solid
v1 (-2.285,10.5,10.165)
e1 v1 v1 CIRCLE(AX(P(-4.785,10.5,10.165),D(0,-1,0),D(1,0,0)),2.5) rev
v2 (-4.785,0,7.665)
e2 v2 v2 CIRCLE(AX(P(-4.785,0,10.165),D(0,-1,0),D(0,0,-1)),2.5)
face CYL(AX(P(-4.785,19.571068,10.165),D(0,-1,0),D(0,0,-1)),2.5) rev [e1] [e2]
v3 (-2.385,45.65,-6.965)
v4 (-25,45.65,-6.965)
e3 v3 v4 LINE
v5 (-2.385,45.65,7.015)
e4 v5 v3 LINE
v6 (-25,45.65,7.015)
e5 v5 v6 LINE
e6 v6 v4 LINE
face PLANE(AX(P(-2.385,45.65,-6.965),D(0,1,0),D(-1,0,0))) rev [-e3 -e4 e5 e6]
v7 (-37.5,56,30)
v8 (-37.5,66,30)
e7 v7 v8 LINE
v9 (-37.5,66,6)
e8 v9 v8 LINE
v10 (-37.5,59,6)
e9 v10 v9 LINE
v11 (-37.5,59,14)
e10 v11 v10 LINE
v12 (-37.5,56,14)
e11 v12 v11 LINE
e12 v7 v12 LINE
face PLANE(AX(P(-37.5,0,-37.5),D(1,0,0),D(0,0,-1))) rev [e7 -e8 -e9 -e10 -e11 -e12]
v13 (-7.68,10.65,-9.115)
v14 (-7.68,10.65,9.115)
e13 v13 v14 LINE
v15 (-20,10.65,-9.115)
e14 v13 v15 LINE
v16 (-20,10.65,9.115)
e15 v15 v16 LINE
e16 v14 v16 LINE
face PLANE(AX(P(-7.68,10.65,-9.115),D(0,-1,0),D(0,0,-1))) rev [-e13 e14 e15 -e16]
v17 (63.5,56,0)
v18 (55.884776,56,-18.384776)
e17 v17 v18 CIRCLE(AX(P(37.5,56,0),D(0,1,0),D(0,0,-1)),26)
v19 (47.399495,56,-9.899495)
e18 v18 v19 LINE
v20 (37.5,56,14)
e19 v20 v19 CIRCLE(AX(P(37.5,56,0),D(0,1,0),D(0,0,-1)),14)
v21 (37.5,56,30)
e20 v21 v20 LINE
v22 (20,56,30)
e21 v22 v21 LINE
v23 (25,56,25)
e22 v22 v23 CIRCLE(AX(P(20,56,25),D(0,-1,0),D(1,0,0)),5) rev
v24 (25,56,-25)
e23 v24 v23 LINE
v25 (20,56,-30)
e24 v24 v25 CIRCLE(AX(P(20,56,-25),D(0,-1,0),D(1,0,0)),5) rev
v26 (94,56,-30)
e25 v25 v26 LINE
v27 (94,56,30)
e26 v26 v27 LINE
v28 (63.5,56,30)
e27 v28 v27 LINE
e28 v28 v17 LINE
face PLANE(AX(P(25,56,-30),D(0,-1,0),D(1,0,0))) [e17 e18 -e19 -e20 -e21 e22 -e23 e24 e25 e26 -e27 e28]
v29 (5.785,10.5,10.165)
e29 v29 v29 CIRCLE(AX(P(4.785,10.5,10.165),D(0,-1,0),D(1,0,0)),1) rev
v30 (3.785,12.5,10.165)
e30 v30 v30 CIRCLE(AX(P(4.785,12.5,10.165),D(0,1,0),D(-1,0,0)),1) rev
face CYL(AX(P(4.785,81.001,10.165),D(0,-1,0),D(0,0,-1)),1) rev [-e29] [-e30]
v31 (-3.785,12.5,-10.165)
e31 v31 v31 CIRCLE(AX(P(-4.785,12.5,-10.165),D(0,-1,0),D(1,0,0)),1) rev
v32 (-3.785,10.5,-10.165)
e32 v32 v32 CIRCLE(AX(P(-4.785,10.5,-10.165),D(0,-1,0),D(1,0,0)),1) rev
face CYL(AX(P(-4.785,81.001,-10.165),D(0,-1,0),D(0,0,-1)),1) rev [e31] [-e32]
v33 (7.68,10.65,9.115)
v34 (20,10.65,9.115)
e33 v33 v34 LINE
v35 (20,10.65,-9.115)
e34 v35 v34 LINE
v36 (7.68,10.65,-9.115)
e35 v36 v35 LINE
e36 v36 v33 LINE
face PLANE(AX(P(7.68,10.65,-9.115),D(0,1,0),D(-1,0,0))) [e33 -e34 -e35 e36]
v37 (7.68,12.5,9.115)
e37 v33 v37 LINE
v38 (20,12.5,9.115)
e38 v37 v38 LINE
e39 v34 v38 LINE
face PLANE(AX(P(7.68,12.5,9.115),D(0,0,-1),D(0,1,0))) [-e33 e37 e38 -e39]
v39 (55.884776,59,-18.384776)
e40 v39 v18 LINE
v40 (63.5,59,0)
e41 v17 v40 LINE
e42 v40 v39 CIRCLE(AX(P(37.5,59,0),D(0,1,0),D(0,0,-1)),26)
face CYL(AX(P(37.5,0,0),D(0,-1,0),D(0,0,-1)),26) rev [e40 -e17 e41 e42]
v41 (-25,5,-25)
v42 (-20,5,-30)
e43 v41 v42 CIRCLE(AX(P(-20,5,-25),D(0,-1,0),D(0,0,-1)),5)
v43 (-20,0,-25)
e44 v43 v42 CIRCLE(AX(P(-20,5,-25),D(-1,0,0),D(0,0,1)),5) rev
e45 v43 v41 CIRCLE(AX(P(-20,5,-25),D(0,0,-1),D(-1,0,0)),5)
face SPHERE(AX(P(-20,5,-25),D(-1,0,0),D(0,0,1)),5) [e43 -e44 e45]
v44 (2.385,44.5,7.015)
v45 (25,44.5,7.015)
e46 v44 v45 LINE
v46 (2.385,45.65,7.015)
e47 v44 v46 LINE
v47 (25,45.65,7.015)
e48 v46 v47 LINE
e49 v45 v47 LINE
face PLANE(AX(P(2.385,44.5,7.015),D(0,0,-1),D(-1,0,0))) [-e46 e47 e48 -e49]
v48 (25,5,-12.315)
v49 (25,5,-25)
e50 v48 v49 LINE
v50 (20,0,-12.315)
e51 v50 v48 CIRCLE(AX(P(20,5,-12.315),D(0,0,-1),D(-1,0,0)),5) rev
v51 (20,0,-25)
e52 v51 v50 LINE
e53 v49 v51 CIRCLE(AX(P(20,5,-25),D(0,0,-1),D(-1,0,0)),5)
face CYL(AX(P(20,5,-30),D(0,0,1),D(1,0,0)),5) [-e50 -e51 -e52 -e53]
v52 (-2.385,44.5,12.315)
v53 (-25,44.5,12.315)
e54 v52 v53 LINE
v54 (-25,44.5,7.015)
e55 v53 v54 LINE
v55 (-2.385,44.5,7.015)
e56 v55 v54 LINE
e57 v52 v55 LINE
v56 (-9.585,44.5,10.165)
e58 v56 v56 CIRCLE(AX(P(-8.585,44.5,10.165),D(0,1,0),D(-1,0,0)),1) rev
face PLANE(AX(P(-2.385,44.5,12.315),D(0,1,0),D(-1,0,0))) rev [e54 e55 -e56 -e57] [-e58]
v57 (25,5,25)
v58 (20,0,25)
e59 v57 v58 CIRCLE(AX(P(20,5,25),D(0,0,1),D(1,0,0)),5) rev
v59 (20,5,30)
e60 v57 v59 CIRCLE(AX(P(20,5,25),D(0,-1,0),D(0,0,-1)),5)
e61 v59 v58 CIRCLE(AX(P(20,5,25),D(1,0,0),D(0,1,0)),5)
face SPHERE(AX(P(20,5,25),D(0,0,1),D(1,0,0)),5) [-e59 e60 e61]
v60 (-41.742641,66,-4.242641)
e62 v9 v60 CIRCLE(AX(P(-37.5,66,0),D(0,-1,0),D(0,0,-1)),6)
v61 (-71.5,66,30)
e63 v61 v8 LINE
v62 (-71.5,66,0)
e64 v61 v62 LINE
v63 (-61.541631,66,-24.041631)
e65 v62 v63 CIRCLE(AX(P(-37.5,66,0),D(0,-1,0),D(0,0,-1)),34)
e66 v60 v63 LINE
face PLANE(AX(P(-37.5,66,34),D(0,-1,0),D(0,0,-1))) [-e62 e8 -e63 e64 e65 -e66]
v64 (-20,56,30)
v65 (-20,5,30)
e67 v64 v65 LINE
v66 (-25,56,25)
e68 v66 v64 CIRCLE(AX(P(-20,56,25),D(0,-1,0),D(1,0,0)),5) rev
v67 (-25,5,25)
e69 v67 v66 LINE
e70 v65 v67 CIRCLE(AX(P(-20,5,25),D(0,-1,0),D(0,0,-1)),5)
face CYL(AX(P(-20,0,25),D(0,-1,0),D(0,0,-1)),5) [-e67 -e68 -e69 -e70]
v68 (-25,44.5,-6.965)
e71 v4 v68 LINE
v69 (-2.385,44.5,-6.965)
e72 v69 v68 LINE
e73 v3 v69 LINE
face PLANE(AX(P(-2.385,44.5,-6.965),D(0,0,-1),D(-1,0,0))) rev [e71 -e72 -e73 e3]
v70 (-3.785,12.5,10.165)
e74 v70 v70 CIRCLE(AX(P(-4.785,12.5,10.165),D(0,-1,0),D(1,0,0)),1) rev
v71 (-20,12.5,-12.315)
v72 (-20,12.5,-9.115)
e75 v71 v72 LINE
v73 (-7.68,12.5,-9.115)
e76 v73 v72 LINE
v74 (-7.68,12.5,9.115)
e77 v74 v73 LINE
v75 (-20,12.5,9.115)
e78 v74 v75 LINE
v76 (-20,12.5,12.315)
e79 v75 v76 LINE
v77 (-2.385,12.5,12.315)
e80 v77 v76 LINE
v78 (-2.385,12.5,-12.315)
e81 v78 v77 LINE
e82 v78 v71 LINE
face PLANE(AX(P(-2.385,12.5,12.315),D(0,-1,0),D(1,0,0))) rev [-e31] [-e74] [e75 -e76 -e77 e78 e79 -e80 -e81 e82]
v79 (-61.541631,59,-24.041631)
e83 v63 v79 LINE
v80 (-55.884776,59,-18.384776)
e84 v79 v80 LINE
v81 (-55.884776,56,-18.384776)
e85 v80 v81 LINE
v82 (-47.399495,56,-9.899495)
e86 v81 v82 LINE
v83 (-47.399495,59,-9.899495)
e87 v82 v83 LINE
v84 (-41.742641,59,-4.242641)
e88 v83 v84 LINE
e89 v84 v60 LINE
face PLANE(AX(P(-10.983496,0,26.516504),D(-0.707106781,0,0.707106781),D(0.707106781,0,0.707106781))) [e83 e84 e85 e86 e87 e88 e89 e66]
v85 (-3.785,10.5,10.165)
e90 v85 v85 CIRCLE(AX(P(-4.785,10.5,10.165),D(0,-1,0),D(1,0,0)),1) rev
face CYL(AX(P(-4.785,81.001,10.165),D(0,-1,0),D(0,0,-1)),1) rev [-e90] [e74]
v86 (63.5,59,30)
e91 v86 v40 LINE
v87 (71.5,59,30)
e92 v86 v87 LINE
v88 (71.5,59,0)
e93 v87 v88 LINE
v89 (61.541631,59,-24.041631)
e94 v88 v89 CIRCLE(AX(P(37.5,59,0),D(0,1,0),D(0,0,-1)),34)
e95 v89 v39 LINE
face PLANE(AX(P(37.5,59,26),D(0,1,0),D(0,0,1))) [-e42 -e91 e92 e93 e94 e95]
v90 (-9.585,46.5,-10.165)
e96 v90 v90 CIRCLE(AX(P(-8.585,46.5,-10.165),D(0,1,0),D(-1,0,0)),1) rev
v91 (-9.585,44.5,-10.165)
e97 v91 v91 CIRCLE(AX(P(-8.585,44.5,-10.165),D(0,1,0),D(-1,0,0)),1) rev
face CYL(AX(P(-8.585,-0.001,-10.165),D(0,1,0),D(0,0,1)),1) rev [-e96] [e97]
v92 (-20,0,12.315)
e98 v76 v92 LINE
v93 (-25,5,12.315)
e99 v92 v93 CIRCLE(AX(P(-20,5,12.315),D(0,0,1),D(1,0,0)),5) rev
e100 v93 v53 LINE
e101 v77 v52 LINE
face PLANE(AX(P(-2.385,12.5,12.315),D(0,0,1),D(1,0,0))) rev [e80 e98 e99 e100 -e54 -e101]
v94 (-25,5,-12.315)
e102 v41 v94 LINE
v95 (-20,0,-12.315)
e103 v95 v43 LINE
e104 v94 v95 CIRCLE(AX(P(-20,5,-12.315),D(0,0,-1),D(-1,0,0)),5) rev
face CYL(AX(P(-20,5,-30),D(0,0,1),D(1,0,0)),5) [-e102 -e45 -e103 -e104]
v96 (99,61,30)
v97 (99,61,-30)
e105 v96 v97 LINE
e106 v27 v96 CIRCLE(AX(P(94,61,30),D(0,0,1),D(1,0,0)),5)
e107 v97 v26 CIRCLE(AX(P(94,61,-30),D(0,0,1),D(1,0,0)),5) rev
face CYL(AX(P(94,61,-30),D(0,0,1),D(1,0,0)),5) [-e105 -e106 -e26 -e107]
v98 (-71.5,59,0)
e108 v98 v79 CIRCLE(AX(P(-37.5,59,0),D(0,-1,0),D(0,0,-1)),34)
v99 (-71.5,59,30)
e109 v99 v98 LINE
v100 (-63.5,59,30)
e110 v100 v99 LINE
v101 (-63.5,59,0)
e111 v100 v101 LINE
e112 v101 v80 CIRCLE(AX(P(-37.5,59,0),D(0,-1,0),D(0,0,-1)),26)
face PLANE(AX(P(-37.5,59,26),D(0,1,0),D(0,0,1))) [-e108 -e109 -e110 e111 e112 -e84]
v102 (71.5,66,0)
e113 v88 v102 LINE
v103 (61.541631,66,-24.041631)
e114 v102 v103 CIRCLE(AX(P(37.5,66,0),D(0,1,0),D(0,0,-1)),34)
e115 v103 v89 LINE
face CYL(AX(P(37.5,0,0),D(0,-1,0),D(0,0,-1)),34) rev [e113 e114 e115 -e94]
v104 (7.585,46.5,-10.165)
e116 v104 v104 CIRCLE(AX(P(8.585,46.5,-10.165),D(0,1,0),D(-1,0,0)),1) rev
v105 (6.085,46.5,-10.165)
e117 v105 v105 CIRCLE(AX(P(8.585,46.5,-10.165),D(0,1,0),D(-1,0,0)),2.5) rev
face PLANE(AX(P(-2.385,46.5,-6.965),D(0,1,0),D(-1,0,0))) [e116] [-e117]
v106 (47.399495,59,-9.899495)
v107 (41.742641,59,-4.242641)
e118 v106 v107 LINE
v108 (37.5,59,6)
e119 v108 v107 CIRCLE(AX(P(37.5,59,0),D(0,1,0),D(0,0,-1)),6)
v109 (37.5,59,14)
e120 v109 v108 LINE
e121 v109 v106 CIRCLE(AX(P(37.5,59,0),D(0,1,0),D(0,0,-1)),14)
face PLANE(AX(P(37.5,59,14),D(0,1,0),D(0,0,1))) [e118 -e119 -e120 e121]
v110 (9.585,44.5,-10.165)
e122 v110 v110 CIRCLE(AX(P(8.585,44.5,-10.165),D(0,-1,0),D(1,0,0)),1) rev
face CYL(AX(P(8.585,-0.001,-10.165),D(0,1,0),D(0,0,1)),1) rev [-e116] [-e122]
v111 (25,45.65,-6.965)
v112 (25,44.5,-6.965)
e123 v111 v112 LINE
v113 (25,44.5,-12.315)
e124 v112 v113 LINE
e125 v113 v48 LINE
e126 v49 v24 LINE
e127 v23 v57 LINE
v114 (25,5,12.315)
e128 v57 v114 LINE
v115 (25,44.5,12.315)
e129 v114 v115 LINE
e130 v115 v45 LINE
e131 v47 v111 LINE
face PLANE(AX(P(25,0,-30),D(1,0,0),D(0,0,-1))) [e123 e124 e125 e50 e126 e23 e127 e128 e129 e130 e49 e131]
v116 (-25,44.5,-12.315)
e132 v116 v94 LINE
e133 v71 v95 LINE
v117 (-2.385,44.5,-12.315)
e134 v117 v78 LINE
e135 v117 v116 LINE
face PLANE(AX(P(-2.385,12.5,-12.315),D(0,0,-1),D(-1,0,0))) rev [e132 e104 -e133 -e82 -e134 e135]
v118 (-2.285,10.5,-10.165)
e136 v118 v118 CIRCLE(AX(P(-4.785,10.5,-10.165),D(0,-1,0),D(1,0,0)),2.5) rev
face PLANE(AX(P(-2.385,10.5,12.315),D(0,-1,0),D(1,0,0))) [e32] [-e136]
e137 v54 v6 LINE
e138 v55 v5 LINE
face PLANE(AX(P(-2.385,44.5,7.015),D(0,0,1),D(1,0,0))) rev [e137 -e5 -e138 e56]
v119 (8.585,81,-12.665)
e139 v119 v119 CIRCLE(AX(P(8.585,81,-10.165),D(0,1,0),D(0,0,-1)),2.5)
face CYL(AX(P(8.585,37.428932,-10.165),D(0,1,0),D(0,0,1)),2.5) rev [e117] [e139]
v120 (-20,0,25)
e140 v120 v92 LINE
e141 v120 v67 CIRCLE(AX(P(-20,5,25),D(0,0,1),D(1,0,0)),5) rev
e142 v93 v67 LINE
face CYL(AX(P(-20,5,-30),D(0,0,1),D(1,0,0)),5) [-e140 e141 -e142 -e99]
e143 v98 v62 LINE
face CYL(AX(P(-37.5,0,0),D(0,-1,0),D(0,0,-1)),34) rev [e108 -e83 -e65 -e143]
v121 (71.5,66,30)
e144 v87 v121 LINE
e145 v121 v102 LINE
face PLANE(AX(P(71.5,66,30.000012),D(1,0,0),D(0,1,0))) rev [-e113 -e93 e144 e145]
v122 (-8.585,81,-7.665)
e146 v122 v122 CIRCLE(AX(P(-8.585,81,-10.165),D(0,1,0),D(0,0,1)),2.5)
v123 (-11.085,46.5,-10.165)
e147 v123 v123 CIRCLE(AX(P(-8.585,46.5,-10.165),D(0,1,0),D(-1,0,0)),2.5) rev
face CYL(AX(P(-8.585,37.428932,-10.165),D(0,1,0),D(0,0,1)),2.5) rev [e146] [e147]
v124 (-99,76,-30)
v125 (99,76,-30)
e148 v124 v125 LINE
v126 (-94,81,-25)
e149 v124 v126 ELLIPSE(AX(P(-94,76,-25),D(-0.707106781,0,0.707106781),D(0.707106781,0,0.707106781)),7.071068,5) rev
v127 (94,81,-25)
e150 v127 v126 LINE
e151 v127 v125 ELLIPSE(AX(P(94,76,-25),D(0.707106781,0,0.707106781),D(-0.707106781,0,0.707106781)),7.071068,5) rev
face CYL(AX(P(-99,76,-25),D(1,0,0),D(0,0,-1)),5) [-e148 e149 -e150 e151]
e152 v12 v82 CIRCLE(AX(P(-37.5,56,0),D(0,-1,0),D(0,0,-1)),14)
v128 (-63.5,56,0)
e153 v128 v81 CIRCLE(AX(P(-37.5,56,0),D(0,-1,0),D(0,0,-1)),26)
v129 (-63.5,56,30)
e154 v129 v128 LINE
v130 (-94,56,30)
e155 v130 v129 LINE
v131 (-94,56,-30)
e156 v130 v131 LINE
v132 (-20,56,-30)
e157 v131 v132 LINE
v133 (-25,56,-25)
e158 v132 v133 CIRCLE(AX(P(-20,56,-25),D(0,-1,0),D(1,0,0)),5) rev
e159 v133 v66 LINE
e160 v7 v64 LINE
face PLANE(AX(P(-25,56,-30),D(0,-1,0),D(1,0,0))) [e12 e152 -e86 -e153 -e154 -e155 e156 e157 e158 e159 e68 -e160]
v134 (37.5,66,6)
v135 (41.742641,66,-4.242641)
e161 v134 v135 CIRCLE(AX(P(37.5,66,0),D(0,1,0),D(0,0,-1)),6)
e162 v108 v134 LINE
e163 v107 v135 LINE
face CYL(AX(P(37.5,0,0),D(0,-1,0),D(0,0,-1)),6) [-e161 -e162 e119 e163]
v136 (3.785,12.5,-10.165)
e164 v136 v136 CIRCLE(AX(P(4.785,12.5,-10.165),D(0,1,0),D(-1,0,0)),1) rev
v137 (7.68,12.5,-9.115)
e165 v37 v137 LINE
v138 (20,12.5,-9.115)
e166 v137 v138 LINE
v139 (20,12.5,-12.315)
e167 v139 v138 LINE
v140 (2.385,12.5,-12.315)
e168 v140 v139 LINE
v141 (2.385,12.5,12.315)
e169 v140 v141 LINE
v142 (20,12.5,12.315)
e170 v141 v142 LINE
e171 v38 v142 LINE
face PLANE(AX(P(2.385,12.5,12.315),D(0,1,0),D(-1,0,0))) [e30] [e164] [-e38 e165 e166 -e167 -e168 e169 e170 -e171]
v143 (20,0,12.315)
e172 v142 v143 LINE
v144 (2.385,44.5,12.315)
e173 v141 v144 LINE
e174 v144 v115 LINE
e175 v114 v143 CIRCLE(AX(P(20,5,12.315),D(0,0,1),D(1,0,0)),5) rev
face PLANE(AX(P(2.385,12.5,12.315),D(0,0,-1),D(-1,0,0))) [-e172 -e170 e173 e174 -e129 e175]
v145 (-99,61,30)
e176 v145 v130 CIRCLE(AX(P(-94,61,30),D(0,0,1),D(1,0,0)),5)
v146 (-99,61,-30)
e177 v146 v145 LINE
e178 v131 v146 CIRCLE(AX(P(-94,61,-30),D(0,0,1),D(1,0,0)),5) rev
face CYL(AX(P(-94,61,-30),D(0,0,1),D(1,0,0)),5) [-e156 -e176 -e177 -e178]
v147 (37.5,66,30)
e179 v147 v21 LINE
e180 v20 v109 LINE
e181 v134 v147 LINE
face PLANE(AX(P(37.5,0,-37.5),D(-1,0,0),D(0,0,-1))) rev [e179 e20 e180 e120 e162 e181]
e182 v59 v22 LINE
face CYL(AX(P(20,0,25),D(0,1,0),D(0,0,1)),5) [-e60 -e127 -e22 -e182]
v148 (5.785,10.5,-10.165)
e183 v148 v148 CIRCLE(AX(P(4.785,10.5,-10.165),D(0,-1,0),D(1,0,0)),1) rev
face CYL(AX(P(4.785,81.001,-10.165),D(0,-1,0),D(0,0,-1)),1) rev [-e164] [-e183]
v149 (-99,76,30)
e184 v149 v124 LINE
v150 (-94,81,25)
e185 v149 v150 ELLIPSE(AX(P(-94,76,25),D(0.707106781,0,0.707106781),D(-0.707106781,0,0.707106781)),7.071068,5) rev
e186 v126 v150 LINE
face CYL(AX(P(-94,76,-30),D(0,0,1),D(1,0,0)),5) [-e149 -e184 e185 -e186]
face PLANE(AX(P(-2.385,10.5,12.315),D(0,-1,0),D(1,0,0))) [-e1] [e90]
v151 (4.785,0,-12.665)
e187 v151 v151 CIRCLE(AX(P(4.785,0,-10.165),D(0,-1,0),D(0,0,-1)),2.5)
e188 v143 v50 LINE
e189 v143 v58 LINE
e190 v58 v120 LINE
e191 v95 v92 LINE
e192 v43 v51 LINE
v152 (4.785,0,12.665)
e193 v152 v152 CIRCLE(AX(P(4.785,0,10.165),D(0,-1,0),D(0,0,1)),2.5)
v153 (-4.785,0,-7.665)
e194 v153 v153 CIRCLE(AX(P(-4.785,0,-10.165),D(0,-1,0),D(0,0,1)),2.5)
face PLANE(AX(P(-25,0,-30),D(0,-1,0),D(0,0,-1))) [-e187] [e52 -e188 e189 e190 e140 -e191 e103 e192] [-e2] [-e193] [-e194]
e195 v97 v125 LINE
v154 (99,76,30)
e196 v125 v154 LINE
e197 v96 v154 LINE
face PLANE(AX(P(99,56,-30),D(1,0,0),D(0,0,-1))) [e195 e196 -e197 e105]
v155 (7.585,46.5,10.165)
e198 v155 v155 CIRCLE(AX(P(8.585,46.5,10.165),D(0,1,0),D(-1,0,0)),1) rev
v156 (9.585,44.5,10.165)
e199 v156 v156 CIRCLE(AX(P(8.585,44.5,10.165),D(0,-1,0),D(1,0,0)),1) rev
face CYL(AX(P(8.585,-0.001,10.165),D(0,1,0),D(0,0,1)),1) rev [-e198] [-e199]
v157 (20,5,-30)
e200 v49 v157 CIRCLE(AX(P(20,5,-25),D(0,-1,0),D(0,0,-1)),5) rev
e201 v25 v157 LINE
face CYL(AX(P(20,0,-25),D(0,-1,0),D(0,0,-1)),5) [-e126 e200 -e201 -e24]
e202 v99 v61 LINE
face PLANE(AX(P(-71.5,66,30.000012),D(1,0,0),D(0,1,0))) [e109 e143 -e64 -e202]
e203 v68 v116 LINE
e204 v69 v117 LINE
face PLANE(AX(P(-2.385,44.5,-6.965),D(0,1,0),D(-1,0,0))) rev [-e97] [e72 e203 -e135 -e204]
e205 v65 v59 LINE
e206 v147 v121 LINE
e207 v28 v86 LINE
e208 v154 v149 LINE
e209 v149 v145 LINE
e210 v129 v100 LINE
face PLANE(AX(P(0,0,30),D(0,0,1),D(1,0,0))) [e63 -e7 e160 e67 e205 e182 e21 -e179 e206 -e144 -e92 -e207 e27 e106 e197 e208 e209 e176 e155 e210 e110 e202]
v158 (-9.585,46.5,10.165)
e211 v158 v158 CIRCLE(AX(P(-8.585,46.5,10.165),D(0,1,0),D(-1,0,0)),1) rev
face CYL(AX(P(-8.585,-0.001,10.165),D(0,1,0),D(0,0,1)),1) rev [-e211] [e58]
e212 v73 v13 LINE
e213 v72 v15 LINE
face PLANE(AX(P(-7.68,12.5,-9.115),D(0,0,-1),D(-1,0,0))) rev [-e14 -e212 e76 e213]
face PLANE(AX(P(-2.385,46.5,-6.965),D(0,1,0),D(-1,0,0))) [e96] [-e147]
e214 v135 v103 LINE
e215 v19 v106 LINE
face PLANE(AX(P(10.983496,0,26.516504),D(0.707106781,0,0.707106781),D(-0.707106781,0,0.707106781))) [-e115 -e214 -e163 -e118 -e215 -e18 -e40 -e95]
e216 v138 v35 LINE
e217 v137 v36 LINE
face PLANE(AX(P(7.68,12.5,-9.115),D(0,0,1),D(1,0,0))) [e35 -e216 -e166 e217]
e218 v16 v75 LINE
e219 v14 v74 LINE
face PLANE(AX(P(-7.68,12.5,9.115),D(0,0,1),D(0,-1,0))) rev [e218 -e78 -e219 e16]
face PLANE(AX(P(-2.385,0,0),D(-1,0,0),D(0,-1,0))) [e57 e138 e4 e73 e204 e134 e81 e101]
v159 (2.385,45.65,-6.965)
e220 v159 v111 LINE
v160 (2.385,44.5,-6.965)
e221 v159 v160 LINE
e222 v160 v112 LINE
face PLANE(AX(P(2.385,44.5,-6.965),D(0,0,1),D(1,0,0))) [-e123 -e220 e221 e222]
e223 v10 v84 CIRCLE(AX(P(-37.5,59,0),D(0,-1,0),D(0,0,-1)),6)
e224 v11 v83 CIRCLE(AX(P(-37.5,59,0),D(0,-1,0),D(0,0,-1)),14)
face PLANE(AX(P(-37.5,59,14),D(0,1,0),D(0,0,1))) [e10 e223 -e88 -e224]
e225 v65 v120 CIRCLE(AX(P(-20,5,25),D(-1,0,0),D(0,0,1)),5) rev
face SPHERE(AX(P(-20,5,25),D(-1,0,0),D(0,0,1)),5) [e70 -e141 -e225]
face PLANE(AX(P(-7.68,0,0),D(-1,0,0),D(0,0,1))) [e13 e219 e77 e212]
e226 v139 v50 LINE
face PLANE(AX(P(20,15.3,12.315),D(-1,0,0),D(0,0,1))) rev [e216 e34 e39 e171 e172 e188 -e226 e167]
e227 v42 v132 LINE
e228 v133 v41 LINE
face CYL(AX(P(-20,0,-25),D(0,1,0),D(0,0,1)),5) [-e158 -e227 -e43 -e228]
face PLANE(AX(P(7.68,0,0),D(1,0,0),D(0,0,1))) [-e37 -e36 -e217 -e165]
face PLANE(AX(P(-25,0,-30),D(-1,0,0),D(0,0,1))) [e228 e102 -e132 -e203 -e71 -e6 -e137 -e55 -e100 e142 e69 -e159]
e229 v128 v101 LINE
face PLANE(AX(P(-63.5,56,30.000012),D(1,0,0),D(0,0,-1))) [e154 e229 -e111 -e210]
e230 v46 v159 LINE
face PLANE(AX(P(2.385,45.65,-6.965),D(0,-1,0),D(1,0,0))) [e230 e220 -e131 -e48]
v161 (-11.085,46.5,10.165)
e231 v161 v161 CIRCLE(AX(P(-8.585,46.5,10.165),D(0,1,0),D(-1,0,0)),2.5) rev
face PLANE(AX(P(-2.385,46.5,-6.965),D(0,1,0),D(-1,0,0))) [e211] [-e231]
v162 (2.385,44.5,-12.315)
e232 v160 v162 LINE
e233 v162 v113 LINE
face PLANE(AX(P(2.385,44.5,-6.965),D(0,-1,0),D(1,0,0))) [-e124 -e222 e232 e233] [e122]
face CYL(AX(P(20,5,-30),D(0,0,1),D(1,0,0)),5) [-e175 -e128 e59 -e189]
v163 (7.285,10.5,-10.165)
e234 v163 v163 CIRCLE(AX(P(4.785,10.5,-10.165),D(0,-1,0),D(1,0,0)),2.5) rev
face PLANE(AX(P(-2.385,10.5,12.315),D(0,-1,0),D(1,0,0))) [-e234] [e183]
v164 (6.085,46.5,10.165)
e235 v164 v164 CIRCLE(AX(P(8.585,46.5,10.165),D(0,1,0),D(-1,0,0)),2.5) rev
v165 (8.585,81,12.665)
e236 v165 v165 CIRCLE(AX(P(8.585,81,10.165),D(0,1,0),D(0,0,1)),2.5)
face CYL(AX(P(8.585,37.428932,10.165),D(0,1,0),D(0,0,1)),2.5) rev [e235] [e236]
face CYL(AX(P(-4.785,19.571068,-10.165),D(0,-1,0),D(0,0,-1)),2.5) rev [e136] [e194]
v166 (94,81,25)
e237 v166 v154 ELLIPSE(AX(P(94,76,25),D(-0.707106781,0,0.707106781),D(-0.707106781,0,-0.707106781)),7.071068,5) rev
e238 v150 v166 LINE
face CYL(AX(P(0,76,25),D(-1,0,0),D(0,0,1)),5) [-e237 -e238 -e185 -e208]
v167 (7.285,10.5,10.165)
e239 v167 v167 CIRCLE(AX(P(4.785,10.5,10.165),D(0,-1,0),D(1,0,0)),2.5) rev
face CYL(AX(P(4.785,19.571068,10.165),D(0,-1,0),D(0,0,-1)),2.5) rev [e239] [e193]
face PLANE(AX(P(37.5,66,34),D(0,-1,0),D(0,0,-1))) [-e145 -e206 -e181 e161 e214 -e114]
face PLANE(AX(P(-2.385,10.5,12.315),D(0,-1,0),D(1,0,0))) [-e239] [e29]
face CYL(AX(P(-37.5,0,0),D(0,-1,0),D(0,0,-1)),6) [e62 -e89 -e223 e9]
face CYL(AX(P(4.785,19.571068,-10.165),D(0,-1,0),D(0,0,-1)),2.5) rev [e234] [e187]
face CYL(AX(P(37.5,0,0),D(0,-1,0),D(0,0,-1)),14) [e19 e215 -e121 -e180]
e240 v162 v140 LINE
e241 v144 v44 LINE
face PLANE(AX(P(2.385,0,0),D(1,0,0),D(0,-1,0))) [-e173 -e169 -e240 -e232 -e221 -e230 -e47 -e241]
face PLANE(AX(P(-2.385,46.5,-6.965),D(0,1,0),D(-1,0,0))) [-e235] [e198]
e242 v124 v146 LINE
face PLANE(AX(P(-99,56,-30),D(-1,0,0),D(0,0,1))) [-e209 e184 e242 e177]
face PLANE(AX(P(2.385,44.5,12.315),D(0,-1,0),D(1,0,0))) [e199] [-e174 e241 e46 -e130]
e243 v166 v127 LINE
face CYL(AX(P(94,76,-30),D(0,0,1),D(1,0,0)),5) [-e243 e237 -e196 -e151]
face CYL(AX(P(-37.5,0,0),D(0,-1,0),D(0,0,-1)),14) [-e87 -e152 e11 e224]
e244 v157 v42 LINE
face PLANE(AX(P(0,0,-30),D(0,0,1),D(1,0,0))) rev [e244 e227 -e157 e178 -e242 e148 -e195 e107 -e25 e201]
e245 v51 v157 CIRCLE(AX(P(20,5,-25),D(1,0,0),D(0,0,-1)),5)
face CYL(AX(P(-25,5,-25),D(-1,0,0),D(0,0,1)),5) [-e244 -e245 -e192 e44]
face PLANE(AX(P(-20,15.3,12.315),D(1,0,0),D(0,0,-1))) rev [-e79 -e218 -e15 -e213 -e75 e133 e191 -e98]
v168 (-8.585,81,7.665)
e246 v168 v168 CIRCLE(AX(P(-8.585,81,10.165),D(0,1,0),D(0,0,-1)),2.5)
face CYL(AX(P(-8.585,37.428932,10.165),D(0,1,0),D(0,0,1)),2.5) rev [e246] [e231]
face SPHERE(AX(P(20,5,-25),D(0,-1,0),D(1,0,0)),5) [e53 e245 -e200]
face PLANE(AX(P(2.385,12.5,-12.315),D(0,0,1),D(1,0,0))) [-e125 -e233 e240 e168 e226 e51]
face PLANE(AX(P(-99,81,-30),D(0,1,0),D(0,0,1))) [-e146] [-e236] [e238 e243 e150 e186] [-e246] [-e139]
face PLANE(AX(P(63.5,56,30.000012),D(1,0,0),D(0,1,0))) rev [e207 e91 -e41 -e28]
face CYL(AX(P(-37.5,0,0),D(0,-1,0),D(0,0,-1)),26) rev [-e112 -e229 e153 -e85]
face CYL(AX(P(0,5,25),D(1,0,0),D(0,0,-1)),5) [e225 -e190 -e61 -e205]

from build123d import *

# Parameters (mm, degrees)
BOSS_EXTRUDE1_DEPTH            = 30
BOSS_EXTRUDE1_DEPTH_BACK       = 30
CUT_REVOLVE2_START             = 59
CUT_REVOLVE2_DEPTH             = 7
CUT_REVOLVE2_START_2           = 56
CUT_REVOLVE2_2_DEPTH           = 3
CUT_EXTRUDE1_DEPTH             = 22.615
CUT_EXTRUDE2_REACH             = 143.287
CUT_EXTRUDE2_DIRECTION_2_DEPTH = 142.286942072
FILLET5_R                      = 5
FILLET6_R                      = 5
SKETCH7_W                      = 18.23
SKETCH7_H                      = 1.85
CUT_EXTRUDE3_DEPTH             = 17.32
SKETCH8_W                      = 20
SKETCH8_H                      = 24.63
CUT_EXTRUDE4_DEPTH             = 15.3
CUT_EXTRUDE5_REACH             = 133.385
SKETCH10_R                     = 1
SKETCH12_R                     = 2.5
CUT_EXTRUDE6_DEPTH             = 10.5
CUT_EXTRUDE7_REACH             = 133.385
SKETCH13_R                     = 1
SKETCH14_R                     = 2.5
CUT_EXTRUDE8_DEPTH             = 34.5


# Read off the part's stored shape, not the designer's step: Cut-Revolve2
with BuildPart() as part:
    # Sketch1 → Boss-Extrude1 (new, two sides: drawn at the far end of the back side and taken through both)
    with BuildSketch(Plane.XY.offset(-BOSS_EXTRUDE1_DEPTH_BACK)):
        Polygon((-25, 0), (-25, 56), (-99, 56), (-99, 81), (99, 81), (99, 56), (25, 56), (25, 0), align=None)
    extrude(amount=BOSS_EXTRUDE1_DEPTH + BOSS_EXTRUDE1_DEPTH_BACK)

    # Cut-Revolve2 outline → Cut-Revolve2 (cut)
    with BuildSketch(Plane(origin=(0, 0, 0), x_dir=(1, 0, 0), z_dir=(0, 1, 0)).offset(CUT_REVOLVE2_START)):
        with BuildLine():
            ThreePointArc((-37.5, -6), (-43.043277195, -2.296100594), (-41.742640687, 4.242640687))
            Line((-41.742640687, 4.242640687), (-61.54163056, 24.04163056))
            ThreePointArc((-61.54163056, 24.04163056), (-71.129711609, -5.004247907), (-53.5, -30))
            Line((-53.5, -30), (-37.5, -30))
            Line((-37.5, -30), (-37.5, -6))
        make_face()
    cut_revolve2 = extrude(amount=CUT_REVOLVE2_DEPTH, mode=Mode.SUBTRACT)

    # Cut-Revolve2 2 outline → Cut-Revolve2 2 (cut)
    with BuildSketch(Plane(origin=(0, 0, 0), x_dir=(1, 0, 0), z_dir=(0, 1, 0)).offset(CUT_REVOLVE2_START_2)):
        with BuildLine():
            Line((-37.5, -26), (-37.5, -14))
            ThreePointArc((-37.5, -14), (-50.434313455, -5.357568053), (-47.399494937, 9.899494937))
            Line((-47.399494937, 9.899494937), (-55.884776311, 18.384776311))
            ThreePointArc((-55.884776311, 18.384776311), (-61.520867845, -9.949769241), (-37.5, -26))
        make_face()
    cut_revolve2_2 = extrude(amount=CUT_REVOLVE2_2_DEPTH, mode=Mode.SUBTRACT)

    # Sketch4 → Cut-Extrude1 (cut)
    with BuildSketch(Plane.ZY.offset(25)):
        Polygon((12.315, 12.5), (-12.315, 12.5), (-12.315, 44.5), (-6.965, 44.5), (-6.965, 45.65), (7.015, 45.65), (7.015, 44.5), (12.315, 44.5), align=None)
    cut_extrude1 = extrude(amount=-CUT_EXTRUDE1_DEPTH, mode=Mode.SUBTRACT)

    # Mirror1: Cut-Extrude1 across plane
    add(cut_extrude1.mirror(Plane.ZY), mode=Mode.SUBTRACT)

    # Sketch5 → Cut-Extrude2 (cut, up to next)
    with BuildSketch(Plane.XY.offset(30), mode=Mode.PRIVATE) as cut_extrude2_sk1:
        Polygon((-63.5, 56), (-37.5, 56), (-37.5, 66), (-71.5, 66), (-71.5, 59), (-63.5, 59), align=None)
    cut_extrude2_tool1 = extrude(cut_extrude2_sk1.sketch, amount=-CUT_EXTRUDE2_REACH, mode=Mode.PRIVATE) & part.part
    cut_extrude2 = cut_extrude2_tool1.solids().sort_by_distance((-53.512658, 61.265823, 30))[0]
    add(cut_extrude2, mode=Mode.SUBTRACT)

    # Sketch5 → Cut-Extrude2 direction 2 (cut)
    with BuildSketch(Plane.XY.offset(30)):
        Polygon((-63.5, 56), (-37.5, 56), (-37.5, 66), (-71.5, 66), (-71.5, 59), (-63.5, 59), align=None)
    cut_extrude2_direction_2 = extrude(amount=CUT_EXTRUDE2_DIRECTION_2_DEPTH, mode=Mode.SUBTRACT)

    # Mirror4: Cut-Revolve2, Cut-Revolve2 2 across plane
    add(cut_revolve2.mirror(Plane.ZY), mode=Mode.SUBTRACT)
    add(cut_revolve2_2.mirror(Plane.ZY), mode=Mode.SUBTRACT)

    # Mirror2: Cut-Extrude2, Cut-Extrude2 direction 2 across plane
    add(cut_extrude2.mirror(Plane.ZY), mode=Mode.SUBTRACT)
    add(cut_extrude2_direction_2.mirror(Plane.ZY), mode=Mode.SUBTRACT)

    # Fillet5
    fillet5_edges = [part.edges().sort_by_distance(p)[0] for p in [
        (-99, 81, 0),
        (99, 81, 0),
        (0, 81, -30),
        (0, 81, 30),
    ]]
    fillet(fillet5_edges, radius=FILLET5_R)

    # Fillet6
    fillet6_edges = [part.edges().sort_by_distance(p)[0] for p in [
        (-25, 0, 0),
        (-99, 56, 0),
        (99, 56, 0),
        (25, 0, 0),
        (0, 0, 30),
        (25, 28, 30),
        (-25, 28, 30),
        (-25, 28, -30),
        (0, 0, -30),
        (25, 28, -30),
    ]]
    fillet(fillet6_edges, radius=FILLET6_R)

    # Sketch7 → Cut-Extrude3 (cut)
    with BuildSketch(Plane.ZY.offset(25)):
        with Locations((0, 11.575)):
            Rectangle(SKETCH7_W, SKETCH7_H)
    cut_extrude3 = extrude(amount=-CUT_EXTRUDE3_DEPTH, mode=Mode.SUBTRACT)

    # Mirror5: Cut-Extrude3 across plane
    add(cut_extrude3.mirror(Plane.ZY), mode=Mode.SUBTRACT)

    # Sketch8 → Cut-Extrude4 (cut)
    with BuildSketch(Plane.XZ):
        with Locations((-30, 0)):
            Rectangle(SKETCH8_W, SKETCH8_H)
        with Locations((30, 0)):
            Rectangle(SKETCH8_W, SKETCH8_H)
    extrude(amount=-CUT_EXTRUDE4_DEPTH, mode=Mode.SUBTRACT)

    # Sketch10 → Cut-Extrude5 (cut, up to next)
    with BuildSketch(Plane(origin=(0, 0, 0), x_dir=(-1, 0, 0), z_dir=(0, -1, 0)), mode=Mode.PRIVATE) as cut_extrude5_sk1:
        with Locations(Location((4.785, -10.165, 0), (0, 0, 90))):
            Circle(SKETCH10_R)
    cut_extrude5_tool1 = extrude(cut_extrude5_sk1.sketch, amount=-CUT_EXTRUDE5_REACH, mode=Mode.PRIVATE) & part.part
    # Sketch10 → Cut-Extrude5 (cut, up to next)
    with BuildSketch(Plane(origin=(0, 0, 0), x_dir=(-1, 0, 0), z_dir=(0, -1, 0)), mode=Mode.PRIVATE) as cut_extrude5_sk2:
        with Locations(Location((4.785, 10.165, 0), (0, 0, 180))):
            Circle(SKETCH10_R)
    cut_extrude5_tool2 = extrude(cut_extrude5_sk2.sketch, amount=-CUT_EXTRUDE5_REACH, mode=Mode.PRIVATE) & part.part
    # Sketch10 → Cut-Extrude5 (cut, up to next)
    with BuildSketch(Plane(origin=(0, 0, 0), x_dir=(-1, 0, 0), z_dir=(0, -1, 0)), mode=Mode.PRIVATE) as cut_extrude5_sk3:
        with Locations(Location((-4.785, 10.165, 0), (0, 0, 90))):
            Circle(SKETCH10_R)
    cut_extrude5_tool3 = extrude(cut_extrude5_sk3.sketch, amount=-CUT_EXTRUDE5_REACH, mode=Mode.PRIVATE) & part.part
    # Sketch10 → Cut-Extrude5 (cut, up to next)
    with BuildSketch(Plane(origin=(0, 0, 0), x_dir=(-1, 0, 0), z_dir=(0, -1, 0)), mode=Mode.PRIVATE) as cut_extrude5_sk4:
        with Locations((-4.785, -10.165)):
            Circle(SKETCH10_R)
    cut_extrude5_tool4 = extrude(cut_extrude5_sk4.sketch, amount=-CUT_EXTRUDE5_REACH, mode=Mode.PRIVATE) & part.part
    add(cut_extrude5_tool1.solids().sort_by_distance((-4.785, 0, 10.165))[0], mode=Mode.SUBTRACT)
    add(cut_extrude5_tool2.solids().sort_by_distance((-4.785, 0, -10.165))[0], mode=Mode.SUBTRACT)
    add(cut_extrude5_tool3.solids().sort_by_distance((4.785, 0, -10.165))[0], mode=Mode.SUBTRACT)
    add(cut_extrude5_tool4.solids().sort_by_distance((4.785, 0, 10.165))[0], mode=Mode.SUBTRACT)

    # Sketch12 → Cut-Extrude6 (cut)
    with BuildSketch(Plane.XZ):
        with Locations(Location((-4.785, 10.165, 0), (0, 0, 270))):
            Circle(SKETCH12_R)
        with Locations((-4.785, -10.165)):
            Circle(SKETCH12_R)
        with Locations(Location((4.785, -10.165, 0), (0, 0, 270))):
            Circle(SKETCH12_R)
        with Locations((4.785, 10.165)):
            Circle(SKETCH12_R)
    extrude(amount=-CUT_EXTRUDE6_DEPTH, mode=Mode.SUBTRACT)

    # Sketch13 → Cut-Extrude7 (cut, up to next)
    with BuildSketch(Plane(origin=(0, 81, 0), x_dir=(1, 0, 0), z_dir=(0, 1, 0)), mode=Mode.PRIVATE) as cut_extrude7_sk1:
        with Locations(Location((-8.585, 10.165, 0), (0, 0, 270))):
            Circle(SKETCH13_R)
    cut_extrude7_tool1 = extrude(cut_extrude7_sk1.sketch, amount=-CUT_EXTRUDE7_REACH, mode=Mode.PRIVATE) & part.part
    # Sketch13 → Cut-Extrude7 (cut, up to next)
    with BuildSketch(Plane(origin=(0, 81, 0), x_dir=(1, 0, 0), z_dir=(0, 1, 0)), mode=Mode.PRIVATE) as cut_extrude7_sk2:
        with Locations(Location((-8.585, -10.165, 0), (0, 0, 180))):
            Circle(SKETCH13_R)
    cut_extrude7_tool2 = extrude(cut_extrude7_sk2.sketch, amount=-CUT_EXTRUDE7_REACH, mode=Mode.PRIVATE) & part.part
    # Sketch13 → Cut-Extrude7 (cut, up to next)
    with BuildSketch(Plane(origin=(0, 81, 0), x_dir=(1, 0, 0), z_dir=(0, 1, 0)), mode=Mode.PRIVATE) as cut_extrude7_sk3:
        with Locations(Location((8.585, -10.165, 0), (0, 0, 270))):
            Circle(SKETCH13_R)
    cut_extrude7_tool3 = extrude(cut_extrude7_sk3.sketch, amount=-CUT_EXTRUDE7_REACH, mode=Mode.PRIVATE) & part.part
    # Sketch13 → Cut-Extrude7 (cut, up to next)
    with BuildSketch(Plane(origin=(0, 81, 0), x_dir=(1, 0, 0), z_dir=(0, 1, 0)), mode=Mode.PRIVATE) as cut_extrude7_sk4:
        with Locations((8.585, 10.165)):
            Circle(SKETCH13_R)
    cut_extrude7_tool4 = extrude(cut_extrude7_sk4.sketch, amount=-CUT_EXTRUDE7_REACH, mode=Mode.PRIVATE) & part.part
    add(cut_extrude7_tool1.solids().sort_by_distance((-8.585, 81, -10.165))[0], mode=Mode.SUBTRACT)
    add(cut_extrude7_tool2.solids().sort_by_distance((-8.585, 81, 10.165))[0], mode=Mode.SUBTRACT)
    add(cut_extrude7_tool3.solids().sort_by_distance((8.585, 81, 10.165))[0], mode=Mode.SUBTRACT)
    add(cut_extrude7_tool4.solids().sort_by_distance((8.585, 81, -10.165))[0], mode=Mode.SUBTRACT)

    # Sketch14 → Cut-Extrude8 (cut)
    with BuildSketch(Plane(origin=(0, 81, 0), x_dir=(1, 0, 0), z_dir=(0, 1, 0))):
        with Locations(Location((-8.585, 10.165, 0), (0, 0, 270))):
            Circle(SKETCH14_R)
        with Locations(Location((-8.585, -10.165, 0), (0, 0, 180))):
            Circle(SKETCH14_R)
        with Locations(Location((8.585, -10.165, 0), (0, 0, 270))):
            Circle(SKETCH14_R)
        with Locations(Location((8.585, 10.165, 0), (0, 0, 180))):
            Circle(SKETCH14_R)
    extrude(amount=-CUT_EXTRUDE8_DEPTH, mode=Mode.SUBTRACT)


solid = part.part
